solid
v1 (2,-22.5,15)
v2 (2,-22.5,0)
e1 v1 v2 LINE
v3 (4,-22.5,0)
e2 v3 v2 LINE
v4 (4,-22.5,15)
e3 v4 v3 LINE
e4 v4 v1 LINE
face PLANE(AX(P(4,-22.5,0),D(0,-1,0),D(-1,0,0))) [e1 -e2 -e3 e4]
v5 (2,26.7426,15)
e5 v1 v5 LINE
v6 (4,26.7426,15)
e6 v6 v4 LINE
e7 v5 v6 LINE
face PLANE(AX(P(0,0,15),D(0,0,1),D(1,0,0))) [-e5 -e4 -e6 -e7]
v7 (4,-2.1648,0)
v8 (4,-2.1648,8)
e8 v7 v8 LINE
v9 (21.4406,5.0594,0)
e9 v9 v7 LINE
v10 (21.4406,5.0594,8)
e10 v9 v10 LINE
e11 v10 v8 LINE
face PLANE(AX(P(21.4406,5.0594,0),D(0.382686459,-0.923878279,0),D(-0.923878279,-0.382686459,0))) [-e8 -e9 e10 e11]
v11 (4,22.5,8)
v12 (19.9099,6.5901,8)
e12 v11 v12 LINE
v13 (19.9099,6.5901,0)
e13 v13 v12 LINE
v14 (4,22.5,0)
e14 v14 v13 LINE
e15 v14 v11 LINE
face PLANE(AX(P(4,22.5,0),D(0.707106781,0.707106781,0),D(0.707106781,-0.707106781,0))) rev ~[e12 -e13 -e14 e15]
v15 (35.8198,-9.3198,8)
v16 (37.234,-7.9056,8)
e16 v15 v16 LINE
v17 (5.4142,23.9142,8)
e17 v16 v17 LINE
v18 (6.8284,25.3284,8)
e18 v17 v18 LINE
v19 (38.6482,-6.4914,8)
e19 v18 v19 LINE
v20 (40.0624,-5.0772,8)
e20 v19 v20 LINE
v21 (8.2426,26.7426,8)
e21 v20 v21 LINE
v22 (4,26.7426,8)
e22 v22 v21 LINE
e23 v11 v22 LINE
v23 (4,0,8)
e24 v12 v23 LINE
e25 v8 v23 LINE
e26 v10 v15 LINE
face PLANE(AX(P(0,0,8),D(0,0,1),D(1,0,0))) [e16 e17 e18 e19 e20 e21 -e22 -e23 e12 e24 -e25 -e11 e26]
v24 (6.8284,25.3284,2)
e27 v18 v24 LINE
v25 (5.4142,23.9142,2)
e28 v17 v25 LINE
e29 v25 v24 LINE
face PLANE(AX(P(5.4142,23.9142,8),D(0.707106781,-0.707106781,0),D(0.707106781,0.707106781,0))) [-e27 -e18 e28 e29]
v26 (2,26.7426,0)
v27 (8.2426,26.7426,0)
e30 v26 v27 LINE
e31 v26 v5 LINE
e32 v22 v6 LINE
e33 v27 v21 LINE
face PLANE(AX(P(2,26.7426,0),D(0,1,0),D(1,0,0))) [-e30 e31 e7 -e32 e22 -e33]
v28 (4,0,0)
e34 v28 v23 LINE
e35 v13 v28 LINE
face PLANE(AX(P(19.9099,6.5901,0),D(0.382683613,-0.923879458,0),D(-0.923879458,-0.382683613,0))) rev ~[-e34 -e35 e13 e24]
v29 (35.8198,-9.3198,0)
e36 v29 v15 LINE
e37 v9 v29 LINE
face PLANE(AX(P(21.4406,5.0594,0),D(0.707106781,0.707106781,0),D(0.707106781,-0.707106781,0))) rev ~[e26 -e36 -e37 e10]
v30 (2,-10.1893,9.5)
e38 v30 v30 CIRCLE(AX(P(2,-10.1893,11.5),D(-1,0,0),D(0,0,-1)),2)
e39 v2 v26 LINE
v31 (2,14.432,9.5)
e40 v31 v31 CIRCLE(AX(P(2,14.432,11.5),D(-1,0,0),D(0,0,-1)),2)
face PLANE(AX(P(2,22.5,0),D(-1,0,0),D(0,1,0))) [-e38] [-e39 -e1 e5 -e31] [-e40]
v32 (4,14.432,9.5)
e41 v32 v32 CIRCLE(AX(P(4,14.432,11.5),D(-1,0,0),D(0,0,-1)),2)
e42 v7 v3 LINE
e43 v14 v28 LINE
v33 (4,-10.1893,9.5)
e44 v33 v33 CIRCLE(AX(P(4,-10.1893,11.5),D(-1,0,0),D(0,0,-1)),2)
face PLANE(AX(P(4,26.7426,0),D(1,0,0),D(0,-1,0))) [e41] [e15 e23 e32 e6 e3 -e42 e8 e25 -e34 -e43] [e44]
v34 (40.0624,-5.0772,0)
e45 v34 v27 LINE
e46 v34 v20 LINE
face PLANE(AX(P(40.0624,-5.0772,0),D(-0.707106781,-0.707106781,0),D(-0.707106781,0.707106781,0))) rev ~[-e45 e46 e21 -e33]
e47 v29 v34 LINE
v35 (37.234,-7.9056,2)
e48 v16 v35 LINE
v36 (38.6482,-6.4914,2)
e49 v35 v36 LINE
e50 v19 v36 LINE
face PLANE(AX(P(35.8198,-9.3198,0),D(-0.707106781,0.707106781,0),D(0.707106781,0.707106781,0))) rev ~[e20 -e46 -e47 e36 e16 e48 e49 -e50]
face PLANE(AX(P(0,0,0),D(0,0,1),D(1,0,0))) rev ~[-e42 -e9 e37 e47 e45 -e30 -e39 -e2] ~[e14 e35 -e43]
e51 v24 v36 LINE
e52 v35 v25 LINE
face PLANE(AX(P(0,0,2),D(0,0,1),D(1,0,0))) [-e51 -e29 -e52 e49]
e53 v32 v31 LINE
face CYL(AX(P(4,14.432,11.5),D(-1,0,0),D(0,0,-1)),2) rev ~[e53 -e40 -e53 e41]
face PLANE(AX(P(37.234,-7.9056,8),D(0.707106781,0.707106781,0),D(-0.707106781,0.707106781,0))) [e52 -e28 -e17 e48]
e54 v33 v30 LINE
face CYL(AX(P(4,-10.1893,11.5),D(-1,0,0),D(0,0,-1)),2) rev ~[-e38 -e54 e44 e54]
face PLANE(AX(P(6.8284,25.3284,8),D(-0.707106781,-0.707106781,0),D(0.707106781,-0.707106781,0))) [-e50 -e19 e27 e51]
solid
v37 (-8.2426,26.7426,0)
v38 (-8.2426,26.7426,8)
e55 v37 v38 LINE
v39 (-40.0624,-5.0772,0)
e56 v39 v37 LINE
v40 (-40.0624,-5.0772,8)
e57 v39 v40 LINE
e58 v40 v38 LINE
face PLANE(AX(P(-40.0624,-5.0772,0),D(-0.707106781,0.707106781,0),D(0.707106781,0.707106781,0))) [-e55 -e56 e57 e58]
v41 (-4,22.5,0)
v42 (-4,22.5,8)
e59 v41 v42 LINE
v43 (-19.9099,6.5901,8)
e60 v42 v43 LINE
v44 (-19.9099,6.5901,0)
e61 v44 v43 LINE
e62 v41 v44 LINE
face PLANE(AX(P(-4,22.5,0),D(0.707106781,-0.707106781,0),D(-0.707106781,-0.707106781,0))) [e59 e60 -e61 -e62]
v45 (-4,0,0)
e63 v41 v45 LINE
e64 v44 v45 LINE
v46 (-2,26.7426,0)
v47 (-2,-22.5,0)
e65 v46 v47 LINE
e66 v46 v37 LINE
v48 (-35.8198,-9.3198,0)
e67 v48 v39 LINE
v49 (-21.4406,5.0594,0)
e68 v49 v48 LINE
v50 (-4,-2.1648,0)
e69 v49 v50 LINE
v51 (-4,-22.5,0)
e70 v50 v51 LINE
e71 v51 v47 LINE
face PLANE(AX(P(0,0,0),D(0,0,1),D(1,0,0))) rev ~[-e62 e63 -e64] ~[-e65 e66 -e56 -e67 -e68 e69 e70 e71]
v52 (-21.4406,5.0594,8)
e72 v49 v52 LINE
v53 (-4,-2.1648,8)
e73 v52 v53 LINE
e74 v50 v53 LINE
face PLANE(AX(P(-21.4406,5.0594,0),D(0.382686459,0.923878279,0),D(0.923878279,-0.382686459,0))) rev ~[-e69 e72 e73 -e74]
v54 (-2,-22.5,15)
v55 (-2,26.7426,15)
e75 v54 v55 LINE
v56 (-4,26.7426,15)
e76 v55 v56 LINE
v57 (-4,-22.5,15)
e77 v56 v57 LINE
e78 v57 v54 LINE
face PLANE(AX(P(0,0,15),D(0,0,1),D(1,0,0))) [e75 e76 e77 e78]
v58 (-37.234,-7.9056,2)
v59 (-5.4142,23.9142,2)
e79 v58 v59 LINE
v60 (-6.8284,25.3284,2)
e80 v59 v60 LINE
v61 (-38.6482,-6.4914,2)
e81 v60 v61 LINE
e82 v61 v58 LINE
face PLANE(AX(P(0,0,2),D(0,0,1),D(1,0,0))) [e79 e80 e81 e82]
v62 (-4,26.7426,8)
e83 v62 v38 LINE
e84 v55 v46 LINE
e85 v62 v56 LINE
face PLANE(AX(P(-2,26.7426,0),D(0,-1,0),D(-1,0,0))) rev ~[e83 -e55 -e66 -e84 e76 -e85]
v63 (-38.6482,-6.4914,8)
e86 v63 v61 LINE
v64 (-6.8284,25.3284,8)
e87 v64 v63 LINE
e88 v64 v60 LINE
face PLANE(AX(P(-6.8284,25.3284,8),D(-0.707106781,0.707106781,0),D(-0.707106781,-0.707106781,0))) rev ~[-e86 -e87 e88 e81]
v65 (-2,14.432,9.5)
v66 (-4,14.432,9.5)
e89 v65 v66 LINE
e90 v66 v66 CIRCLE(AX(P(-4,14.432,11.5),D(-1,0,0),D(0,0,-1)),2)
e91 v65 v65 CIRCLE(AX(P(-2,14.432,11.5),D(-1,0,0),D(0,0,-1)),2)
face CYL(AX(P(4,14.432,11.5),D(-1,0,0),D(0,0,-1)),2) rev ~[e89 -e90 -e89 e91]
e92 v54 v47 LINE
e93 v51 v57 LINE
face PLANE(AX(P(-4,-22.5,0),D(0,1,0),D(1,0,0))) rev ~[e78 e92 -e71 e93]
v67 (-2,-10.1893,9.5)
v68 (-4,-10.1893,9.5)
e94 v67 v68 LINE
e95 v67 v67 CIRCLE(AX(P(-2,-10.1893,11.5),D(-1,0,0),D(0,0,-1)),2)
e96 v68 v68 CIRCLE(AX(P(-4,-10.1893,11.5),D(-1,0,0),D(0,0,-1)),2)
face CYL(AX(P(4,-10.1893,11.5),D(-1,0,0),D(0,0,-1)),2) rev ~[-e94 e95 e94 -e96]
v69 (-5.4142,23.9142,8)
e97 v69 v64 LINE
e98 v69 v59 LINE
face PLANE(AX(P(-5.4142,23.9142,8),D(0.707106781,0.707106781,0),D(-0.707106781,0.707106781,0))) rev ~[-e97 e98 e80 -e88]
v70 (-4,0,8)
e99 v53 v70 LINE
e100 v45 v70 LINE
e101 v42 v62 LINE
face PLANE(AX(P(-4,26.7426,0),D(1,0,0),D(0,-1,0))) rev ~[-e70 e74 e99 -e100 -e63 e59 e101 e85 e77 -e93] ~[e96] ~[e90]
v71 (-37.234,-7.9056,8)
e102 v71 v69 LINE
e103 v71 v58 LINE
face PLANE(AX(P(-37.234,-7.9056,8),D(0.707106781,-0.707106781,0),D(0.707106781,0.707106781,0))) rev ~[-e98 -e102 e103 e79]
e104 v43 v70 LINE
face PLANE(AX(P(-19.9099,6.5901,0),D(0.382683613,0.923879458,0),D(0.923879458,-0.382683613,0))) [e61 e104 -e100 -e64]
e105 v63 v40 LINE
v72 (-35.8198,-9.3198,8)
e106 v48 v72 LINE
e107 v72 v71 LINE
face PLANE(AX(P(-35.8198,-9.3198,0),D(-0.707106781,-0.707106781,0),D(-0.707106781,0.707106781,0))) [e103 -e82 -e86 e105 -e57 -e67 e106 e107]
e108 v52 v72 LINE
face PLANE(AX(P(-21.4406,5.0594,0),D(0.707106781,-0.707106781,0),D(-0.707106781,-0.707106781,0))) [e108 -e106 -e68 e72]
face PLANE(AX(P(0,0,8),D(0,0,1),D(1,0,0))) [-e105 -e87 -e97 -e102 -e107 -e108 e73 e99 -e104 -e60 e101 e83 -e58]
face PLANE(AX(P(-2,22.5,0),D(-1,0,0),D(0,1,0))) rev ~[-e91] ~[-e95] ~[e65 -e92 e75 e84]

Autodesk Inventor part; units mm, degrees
ref_plane "YZ Plane" through (0, 0, 0) normal (1, 0, 0) x (0, 1, 0)
ref_plane "XZ Plane" through (0, 0, 0) normal (0, 1, 0) x (-1, 0, 0)
ref_plane "XY Plane" through (0, 0, 0) normal (0, 0, 1) x (1, 0, 0)
sketch "support_base" plane through (0, 0, 0) normal (0, 0, 1) x (1, 0, 0)
  line L0 (-24.7251, -5.2251) -> (20.2749, -5.2251)
  line L1 (20.2749, -5.2251) -> (20.2749, 0.7749)
  line L2 (20.2749, 0.7749) -> (-24.7251, 0.7749)
  line L3 (-24.7251, 0.7749) -> (-24.7251, -5.2251)
  line L4 (-24.7251, -5.2251) -> (20.2749, 0.7749) construction
  line L5 (20.2749, -5.2251) -> (-24.7251, 0.7749) construction
  line L6 (20.2749, 0.7749) -> (-11.5449, 32.5947)
  line L7 (-11.5449, 32.5947) -> (-10.1307, 34.009)
  line L8 (-10.1307, 34.009) -> (21.6892, 2.1892)
  line L9 (21.6892, 2.1892) -> (20.2749, 0.7749)
  line L10 (21.6892, 2.1892) -> (24.6892, -0.8108)
  line L11 (24.6892, -0.8108) -> (20.2749, -5.2251)
  line L12 (-2.2251, 0.7749) -> (4.365, 16.6848)
  line L13 (-4.3898, 0.7749) -> (2.8343, 18.2156)
  point P0 (4.5036, 7.635)
  point P1 (-2.2251, -2.2251)
  point P2 (-2.2251, -2.2251)
  dimension "d65" = 45
  dimension "d66" = 2
  dimension "d67" = 45
  dimension "d68" = 6
  dimension "d69" = 2
sketch "Sketch11" plane through (0, 0, 0) normal (0, 0, 1) x (1, 0, 0)
  line L0 (0, 4) -> (0, -4) construction
  line L1 (2, 0) -> (0, 0) construction
  line L2 (40.0624, -5.0772) -> (8.2426, 26.7426)
  line L3 (8.2426, 26.7426) -> (4, 22.5)
  line L4 (4, 22.5) -> (35.8198, -9.3198)
  line L5 (35.8198, -9.3198) -> (40.0624, -5.0772)
  line L6 (40.0624, -5.0772) -> (4, 22.5) construction
  line L7 (8.2426, 26.7426) -> (35.8198, -9.3198) construction
  line L8 (4, 22.5) -> (4, -22.5)
  line L9 (4, -22.5) -> (2, -22.5)
  line L10 (2, -22.5) -> (2, 22.5)
  line L11 (2, 22.5) -> (4, 22.5)
  line L12 (2, 22.5) -> (2, 26.7426)
  line L13 (2, 26.7426) -> (8.2426, 26.7426)
  line L14 (19.9099, 6.5901) -> (4, 0)
  line L15 (21.4406, 5.0594) -> (4, -2.1648)
  line L16 (-40.0624, -5.0772) -> (-8.2426, 26.7426)
  line L17 (-8.2426, 26.7426) -> (-4, 22.5)
  line L18 (-4, 22.5) -> (-35.8198, -9.3198)
  line L19 (-35.8198, -9.3198) -> (-40.0624, -5.0772)
  line L20 (-40.0624, -5.0772) -> (-4, 22.5) construction
  line L21 (-8.2426, 26.7426) -> (-35.8198, -9.3198) construction
  line L22 (-4, 22.5) -> (-4, -22.5)
  line L23 (-4, -22.5) -> (-2, -22.5)
  line L24 (-2, -22.5) -> (-2, 22.5)
  line L25 (-2, 22.5) -> (-4, 22.5)
  line L26 (-2, 22.5) -> (-2, 26.7426)
  line L27 (-2, 26.7426) -> (-8.2426, 26.7426)
  line L28 (-19.9099, 6.5901) -> (-4, 0)
  line L29 (-21.4406, 5.0594) -> (-4, -2.1648)
  point P0 (2, 0)
  dimension "d80" = 2
  dimension "d81" = 8
extrude "Extrusion10" add sketch "Sketch11" along normal blind 8 contours L5 L4 L3 L2 | L3 L11 L12 L13 | L8 L9 L10 L11 | L15 L8 L14 L4 | L16 L17 L18 L19 | L27 L26 L25 L17 | L25 L24 L23 L22 | L18 L28 L22 L29
sketch "Sketch12" plane through (0, 0, 8) normal (0, 0, 1) x (1, 0, 0)
  line L0 (0, 28.3324) -> (0, -28.3324) construction
  line L1 (2, -22.5) -> (4, -22.5) construction
  line L2 (4, -22.5) -> (4, -2.1648) construction
  line L3 (4, -2.1648) -> (21.4406, 5.0594) construction
  line L4 (21.4406, 5.0594) -> (35.8198, -9.3198) construction
  line L5 (35.8198, -9.3198) -> (40.0624, -5.0772) construction
  line L6 (40.0624, -5.0772) -> (8.2426, 26.7426) construction
  line L7 (8.2426, 26.7426) -> (2, 26.7426) construction
  line L8 (2, 26.7426) -> (2, -22.5) construction
  line L9 (4, 22.5) -> (19.9099, 6.5901) construction
  line L10 (19.9099, 6.5901) -> (4, 0) construction
  line L11 (4, 0) -> (4, 22.5) construction
  line L12 (2, -22.5) -> (2, 26.7426)
  line L13 (2, 26.7426) -> (4, 26.7426)
  line L14 (4, 26.7426) -> (4, -22.5)
  line L15 (4, -22.5) -> (2, -22.5)
  line L16 (4, 0) -> (4, 22.5) projected
  line L17 (2, 26.7426) -> (2, -22.5) projected
  line L18 (2, -22.5) -> (4, -22.5) projected
  line L19 (8.2426, 26.7426) -> (2, 26.7426) projected
  line L20 (-2, -22.5) -> (-2, 26.7426)
  line L21 (-2, 26.7426) -> (-4, 26.7426)
  line L22 (-4, 26.7426) -> (-4, -22.5)
  line L23 (-4, -22.5) -> (-2, -22.5)
  line L24 (35.8198, -9.3198) -> (40.0624, -5.0772) projected
  line L25 (38.6482, -6.4914) -> (37.234, -7.9056)
  line L26 (37.234, -7.9056) -> (5.4142, 23.9142)
  line L27 (5.4142, 23.9142) -> (6.8284, 25.3284)
  line L28 (6.8284, 25.3284) -> (38.6482, -6.4914)
  line L29 (40.0624, -5.0772) -> (8.2426, 26.7426) projected
  line L30 (8.2426, 26.7426) -> (4, 22.5) construction
  line L31 (-38.6482, -6.4914) -> (-37.234, -7.9056)
  line L32 (-37.234, -7.9056) -> (-5.4142, 23.9142)
  line L33 (-5.4142, 23.9142) -> (-6.8284, 25.3284)
  line L34 (-6.8284, 25.3284) -> (-38.6482, -6.4914)
  point P0 (0, 0)
  point P1 (0, 0)
  point P2 (37.9411, -7.1985)
  dimension "d75" = 2
extrude "Extrusion12" cut sketch "Sketch12" against normal blind 6 contours L26 L27 L28 L24 | L34 L33 L32 L31
extrude "Extrusion13" add sketch "Sketch12" along normal blind 15 from surface at -8 contours L12 L13 L14 L15 | L23 L22 L21 L20
sketch "Sketch13" plane through (4, 0, 0) normal (1, 0, 0) x (0, 0, -1)
  line L0 (-8, 26.7426) -> (-15, 26.7426) projected
  line L1 (0, -22.5) -> (-15, -22.5) projected
  line L2 (-15, 26.7426) -> (-15, -22.5) construction
  line L3 (-15, 2.1213) -> (-11.5, 2.1213) construction
  line L4 (-11.5, 2.1213) -> (-11.5, 26.7426) construction
  line L5 (-11.5, 2.1213) -> (-11.5, -22.5) construction
  point P0 (0, 0)
  point P1 (-11.5, 14.432)
  point P2 (-11.5, -10.1893)
hole "Hole1" at (4, 14.432, 11.5) at (4, -10.1893, 11.5) direction (-1, 0, 0) diameter 4 end through all
equation "\"d66\" = wall_t"
equation "\"d67\" = supp_h"
equation "\"d68\" = disp_t + 2 * wall_t"
equation "\"d69\" = wall_t"
equation "\"d80\" = wall_t"
equation "\"d81\" = 4 * wall_t"
equation "\"d70\" = disp_s + wall_t"
equation "\"d75\" = disp_t"
equation "\"d76\" = disp_s"
equation "\"d78\" = supp_b"
equation "\"d82\" = hole_d"
equation "\"wall_t\" = 2"
equation "\"disp_t\" = 2"
equation "\"supp_b\" = 15"
equation "\"disp_s\" = 6"
equation "\"supp_h\" = 45"
equation "\"hole_d\" = 4"
properties part number "coffee"
